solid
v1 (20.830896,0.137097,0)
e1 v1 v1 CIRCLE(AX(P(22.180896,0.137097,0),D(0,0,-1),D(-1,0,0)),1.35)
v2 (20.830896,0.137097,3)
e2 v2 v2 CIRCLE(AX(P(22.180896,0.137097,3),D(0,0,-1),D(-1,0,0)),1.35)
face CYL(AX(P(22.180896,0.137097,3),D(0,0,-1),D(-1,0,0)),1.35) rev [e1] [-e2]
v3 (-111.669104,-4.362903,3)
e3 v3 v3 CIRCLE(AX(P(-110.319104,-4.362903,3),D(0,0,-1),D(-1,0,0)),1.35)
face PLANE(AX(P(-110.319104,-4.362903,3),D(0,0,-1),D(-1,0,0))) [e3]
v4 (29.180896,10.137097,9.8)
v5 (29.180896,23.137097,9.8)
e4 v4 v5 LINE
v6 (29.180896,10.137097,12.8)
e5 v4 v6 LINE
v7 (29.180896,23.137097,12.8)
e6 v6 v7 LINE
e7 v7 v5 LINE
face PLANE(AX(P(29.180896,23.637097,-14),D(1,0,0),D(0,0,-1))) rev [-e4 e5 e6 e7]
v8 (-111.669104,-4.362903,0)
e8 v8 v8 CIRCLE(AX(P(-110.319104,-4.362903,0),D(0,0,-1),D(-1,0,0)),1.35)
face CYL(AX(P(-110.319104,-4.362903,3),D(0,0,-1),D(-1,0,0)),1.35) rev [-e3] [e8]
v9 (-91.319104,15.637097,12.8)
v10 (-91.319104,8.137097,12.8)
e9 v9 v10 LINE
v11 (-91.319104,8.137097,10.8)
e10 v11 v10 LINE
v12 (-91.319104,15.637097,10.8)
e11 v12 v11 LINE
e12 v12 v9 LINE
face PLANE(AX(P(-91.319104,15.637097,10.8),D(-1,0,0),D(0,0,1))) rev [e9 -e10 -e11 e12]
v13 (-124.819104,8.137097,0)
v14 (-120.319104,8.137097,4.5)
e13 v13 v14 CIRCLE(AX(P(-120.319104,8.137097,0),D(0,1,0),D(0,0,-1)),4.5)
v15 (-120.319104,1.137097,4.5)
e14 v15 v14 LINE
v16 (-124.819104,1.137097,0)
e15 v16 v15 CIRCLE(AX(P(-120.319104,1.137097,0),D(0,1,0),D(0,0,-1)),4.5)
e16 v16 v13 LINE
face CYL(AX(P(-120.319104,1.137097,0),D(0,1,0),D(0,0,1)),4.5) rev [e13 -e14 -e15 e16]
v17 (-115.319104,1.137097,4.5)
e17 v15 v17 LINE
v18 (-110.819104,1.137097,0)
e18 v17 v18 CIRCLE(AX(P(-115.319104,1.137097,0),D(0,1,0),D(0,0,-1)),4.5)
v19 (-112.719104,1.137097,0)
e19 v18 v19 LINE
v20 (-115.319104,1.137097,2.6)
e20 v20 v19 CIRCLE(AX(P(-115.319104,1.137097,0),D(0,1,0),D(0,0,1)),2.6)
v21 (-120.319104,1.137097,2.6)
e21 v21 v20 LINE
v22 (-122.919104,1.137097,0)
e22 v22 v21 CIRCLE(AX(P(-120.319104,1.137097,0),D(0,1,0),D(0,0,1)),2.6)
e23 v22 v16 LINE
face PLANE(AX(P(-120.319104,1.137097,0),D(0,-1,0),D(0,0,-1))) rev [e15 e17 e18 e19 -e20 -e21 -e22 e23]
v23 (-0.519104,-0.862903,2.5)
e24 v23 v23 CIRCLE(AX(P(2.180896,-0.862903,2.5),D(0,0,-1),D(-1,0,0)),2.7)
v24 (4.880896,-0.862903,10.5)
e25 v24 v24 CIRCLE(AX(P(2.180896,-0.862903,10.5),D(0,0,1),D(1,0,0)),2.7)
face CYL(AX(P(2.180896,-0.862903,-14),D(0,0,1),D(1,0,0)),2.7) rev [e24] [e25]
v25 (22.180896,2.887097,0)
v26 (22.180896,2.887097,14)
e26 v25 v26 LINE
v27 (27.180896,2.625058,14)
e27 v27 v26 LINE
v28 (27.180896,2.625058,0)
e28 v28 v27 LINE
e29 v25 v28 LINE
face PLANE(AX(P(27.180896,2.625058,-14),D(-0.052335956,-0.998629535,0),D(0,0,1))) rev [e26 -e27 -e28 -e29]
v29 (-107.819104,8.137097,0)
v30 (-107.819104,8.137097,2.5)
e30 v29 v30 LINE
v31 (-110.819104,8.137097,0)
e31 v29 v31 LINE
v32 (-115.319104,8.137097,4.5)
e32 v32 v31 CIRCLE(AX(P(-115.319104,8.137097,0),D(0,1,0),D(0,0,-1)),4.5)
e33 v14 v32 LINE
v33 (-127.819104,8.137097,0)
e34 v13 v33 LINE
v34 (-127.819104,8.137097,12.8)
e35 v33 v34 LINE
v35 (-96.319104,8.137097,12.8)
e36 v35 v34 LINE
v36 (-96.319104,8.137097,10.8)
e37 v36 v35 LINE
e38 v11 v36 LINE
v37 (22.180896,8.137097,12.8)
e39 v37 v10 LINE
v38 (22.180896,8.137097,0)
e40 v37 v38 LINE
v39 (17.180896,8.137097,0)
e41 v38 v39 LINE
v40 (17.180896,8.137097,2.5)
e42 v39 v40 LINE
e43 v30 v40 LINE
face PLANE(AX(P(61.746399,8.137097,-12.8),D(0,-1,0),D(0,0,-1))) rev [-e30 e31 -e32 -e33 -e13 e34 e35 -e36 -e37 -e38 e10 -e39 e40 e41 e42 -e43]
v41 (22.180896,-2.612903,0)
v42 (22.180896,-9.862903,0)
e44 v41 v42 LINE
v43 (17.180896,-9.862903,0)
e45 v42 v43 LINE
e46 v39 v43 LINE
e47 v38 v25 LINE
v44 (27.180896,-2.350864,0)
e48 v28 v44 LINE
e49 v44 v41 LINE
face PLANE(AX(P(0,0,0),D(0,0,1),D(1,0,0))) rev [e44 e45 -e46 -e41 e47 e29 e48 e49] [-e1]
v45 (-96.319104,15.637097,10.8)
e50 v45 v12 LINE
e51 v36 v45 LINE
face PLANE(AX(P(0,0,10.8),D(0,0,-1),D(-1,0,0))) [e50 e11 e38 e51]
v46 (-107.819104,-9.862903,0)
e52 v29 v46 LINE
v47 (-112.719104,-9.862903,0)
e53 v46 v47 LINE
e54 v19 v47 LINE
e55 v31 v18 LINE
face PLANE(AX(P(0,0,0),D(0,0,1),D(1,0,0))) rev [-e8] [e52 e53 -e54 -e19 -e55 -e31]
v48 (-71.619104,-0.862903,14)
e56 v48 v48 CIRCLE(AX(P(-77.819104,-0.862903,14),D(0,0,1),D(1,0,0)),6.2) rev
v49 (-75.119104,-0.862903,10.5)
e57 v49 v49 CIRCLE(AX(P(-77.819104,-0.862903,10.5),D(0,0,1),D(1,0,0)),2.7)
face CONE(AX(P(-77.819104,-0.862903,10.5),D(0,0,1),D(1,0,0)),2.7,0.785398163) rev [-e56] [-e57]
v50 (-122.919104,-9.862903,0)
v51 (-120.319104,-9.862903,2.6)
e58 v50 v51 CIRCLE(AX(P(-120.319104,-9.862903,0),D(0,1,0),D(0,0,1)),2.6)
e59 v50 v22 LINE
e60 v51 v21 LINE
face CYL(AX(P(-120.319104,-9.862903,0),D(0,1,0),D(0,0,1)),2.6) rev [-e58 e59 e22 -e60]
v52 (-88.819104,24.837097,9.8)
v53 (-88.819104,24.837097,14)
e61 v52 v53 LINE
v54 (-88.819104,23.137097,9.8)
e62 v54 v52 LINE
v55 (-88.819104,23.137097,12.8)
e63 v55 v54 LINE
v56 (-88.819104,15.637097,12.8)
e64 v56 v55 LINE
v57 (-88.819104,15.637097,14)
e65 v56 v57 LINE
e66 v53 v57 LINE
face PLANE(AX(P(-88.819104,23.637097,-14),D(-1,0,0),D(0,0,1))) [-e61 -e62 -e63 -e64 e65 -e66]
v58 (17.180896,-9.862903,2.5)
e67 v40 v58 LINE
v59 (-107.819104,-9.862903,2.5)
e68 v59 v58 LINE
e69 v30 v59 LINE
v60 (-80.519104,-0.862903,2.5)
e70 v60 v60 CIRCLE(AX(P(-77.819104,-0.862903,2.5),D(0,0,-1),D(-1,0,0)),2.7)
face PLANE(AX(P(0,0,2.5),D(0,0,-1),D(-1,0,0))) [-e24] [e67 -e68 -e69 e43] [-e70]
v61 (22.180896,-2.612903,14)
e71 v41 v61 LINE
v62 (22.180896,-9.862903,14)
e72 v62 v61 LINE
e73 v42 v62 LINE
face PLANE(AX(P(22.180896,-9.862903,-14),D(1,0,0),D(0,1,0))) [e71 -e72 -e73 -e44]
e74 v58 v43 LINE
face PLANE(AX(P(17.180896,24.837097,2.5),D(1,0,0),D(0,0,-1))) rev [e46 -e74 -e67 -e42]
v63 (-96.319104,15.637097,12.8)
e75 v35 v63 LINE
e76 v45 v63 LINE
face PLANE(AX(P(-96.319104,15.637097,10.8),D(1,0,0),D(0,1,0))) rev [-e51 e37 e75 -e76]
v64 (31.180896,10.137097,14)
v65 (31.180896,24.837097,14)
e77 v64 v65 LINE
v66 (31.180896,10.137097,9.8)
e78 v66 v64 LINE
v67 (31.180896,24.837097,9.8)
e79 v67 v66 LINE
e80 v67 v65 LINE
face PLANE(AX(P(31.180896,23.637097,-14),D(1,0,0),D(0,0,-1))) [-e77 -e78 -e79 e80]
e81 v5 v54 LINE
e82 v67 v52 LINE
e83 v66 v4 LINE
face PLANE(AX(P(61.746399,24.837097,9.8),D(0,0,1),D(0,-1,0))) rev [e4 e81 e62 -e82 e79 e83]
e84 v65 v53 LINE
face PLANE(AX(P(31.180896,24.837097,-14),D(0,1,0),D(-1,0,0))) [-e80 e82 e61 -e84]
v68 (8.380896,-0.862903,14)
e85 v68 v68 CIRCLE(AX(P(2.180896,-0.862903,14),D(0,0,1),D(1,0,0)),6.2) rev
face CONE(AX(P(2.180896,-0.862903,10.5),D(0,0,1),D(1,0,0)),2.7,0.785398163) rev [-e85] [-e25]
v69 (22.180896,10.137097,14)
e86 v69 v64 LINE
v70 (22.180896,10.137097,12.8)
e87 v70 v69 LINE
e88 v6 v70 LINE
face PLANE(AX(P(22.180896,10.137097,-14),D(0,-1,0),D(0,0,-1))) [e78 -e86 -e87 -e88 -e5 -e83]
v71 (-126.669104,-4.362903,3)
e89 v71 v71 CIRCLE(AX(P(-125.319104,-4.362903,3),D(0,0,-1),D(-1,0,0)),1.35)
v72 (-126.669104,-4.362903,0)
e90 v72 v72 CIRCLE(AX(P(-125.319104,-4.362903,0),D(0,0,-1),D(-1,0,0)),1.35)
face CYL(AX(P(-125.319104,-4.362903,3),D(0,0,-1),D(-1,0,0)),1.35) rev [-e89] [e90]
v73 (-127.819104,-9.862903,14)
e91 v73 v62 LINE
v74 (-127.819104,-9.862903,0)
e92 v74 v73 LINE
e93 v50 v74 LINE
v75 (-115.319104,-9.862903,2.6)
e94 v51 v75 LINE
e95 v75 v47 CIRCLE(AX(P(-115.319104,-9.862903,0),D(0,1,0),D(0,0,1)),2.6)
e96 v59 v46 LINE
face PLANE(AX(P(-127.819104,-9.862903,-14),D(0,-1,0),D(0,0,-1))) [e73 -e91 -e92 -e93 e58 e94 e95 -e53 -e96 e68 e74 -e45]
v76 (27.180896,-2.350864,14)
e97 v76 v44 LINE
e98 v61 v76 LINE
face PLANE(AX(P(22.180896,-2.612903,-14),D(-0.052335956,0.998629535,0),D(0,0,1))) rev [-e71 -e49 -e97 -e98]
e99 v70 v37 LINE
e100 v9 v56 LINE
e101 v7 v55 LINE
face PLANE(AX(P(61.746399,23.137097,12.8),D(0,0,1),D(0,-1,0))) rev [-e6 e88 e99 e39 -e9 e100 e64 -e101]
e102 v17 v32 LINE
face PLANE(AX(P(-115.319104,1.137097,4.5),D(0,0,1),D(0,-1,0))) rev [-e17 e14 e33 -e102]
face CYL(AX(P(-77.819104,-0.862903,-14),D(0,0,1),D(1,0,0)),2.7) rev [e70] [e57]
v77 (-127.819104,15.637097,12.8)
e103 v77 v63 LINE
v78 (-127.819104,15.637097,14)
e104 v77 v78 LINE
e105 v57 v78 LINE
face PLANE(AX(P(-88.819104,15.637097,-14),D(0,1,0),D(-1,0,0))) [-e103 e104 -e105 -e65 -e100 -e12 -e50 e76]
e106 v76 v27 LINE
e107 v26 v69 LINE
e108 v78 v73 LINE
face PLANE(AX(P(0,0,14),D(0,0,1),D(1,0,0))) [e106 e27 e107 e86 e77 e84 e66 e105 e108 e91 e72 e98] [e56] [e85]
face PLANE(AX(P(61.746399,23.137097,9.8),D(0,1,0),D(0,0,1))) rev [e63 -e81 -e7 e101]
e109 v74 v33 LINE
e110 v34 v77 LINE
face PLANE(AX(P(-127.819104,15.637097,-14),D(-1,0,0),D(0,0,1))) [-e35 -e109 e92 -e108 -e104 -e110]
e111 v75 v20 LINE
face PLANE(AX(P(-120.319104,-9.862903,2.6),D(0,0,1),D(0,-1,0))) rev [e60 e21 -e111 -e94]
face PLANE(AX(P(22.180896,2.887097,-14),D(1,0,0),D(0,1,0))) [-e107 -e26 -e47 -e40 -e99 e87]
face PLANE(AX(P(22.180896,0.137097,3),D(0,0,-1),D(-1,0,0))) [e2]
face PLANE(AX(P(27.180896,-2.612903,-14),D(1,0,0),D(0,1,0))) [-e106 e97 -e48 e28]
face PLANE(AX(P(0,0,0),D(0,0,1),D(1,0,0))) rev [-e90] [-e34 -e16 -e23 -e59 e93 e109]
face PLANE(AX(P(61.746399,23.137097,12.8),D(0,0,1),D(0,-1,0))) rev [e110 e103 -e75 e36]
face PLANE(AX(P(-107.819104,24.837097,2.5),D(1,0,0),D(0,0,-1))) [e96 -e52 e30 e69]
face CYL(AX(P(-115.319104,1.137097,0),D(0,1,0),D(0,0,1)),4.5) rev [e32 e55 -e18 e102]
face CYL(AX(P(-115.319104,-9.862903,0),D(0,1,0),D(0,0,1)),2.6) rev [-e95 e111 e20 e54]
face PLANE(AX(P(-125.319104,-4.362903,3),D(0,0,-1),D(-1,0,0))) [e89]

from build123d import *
from OCP.BRepFilletAPI import BRepFilletAPI_MakeChamfer

# Parameters (mm, degrees)
BOSS_EXTRUDE1_DEPTH      = 14
BOSS_EXTRUDE1_DEPTH_BACK = 14
CUT_EXTRUDE1_DEPTH       = 157
CUT_EXTRUDE4_DEPTH       = 2.5
CUT_EXTRUDE4_DEPTH_BACK  = 2.5
SKETCH8_W                = 125
SKETCH8_H                = 34.7
CUT_EXTRUDE5_DEPTH       = 131.960317585
CUT_EXTRUDE5_DEPTH_BACK  = 131.960317585
SKETCH9_R                = 2.7
CHAMFER2_SIZE            = 5
CHAMFER2_SIZE_2          = 0.262038896
CUT_EXTRUDE8_DEPTH       = 7
CUT_EXTRUDE9_DEPTH       = 131.749429849
SKETCH16_W               = 214.344642296
SKETCH16_H               = 84.645654919
CUT_EXTRUDE10_DEPTH      = 131.960317585
SKETCH17_W               = 2
SKETCH17_H               = 14.7
CUT_EXTRUDE11_DEPTH      = 9.8
SKETCH18_R               = 1.35
CUT_EXTRUDE12_DEPTH      = 3
CHAMFER7_SIZE            = 3.5
SKETCH19_W               = 5
SKETCH19_H               = 7.5
BOSS_EXTRUDE2_DEPTH      = 2


with BuildPart() as part:
    # Sketch1 → Boss-Extrude1 (new, two sides: drawn at the far end of the back side and taken through both)
    with BuildSketch(Plane.XY.offset(-BOSS_EXTRUDE1_DEPTH_BACK)):
        Polygon((-127.819104229, -9.862903226), (22.180895771, -9.862903226), (22.180895771, -2.612903226), (27.180895771, -2.612903226), (27.180895771, 2.887096774), (22.180895771, 2.887096774), (22.180895771, 10.137096774), (31.180895771, 10.137096774), (31.180895771, 23.637096774), (31.180895771, 24.837096774), (-88.819104229, 24.837096774), (-88.819104229, 23.637096774), (-88.819104229, 15.637096774), (-127.819104229, 15.637096774), align=None)
    extrude(amount=BOSS_EXTRUDE1_DEPTH + BOSS_EXTRUDE1_DEPTH_BACK)

    # Sketch2 → Cut-Extrude1 (cut)
    with BuildSketch(Plane.ZY.offset(127.819104229)):
        Polygon((-12.8, 23.137096774), (-12.8, 8.137096774), (12.8, 8.137096774), (12.8, 23.137096774), (9.8, 23.137096774), (9.8, 24.837096774), (-9.8, 24.837096774), (-9.8, 23.137096774), align=None)
    extrude(amount=-CUT_EXTRUDE1_DEPTH, mode=Mode.SUBTRACT)

    # Sketch8 → Cut-Extrude4 (cut, two sides: drawn at the far end of the back side and taken through both)
    with BuildSketch(Plane.XY.offset(-CUT_EXTRUDE4_DEPTH_BACK)):
        with Locations((-45.319104229, 7.487096774)):
            Rectangle(SKETCH8_W, SKETCH8_H)
    extrude(amount=CUT_EXTRUDE4_DEPTH + CUT_EXTRUDE4_DEPTH_BACK, mode=Mode.SUBTRACT)

    # Sketch9 → Cut-Extrude5 (cut, two sides: drawn at the far end of the back side and taken through both)
    with BuildSketch(Plane.XY.offset(-CUT_EXTRUDE5_DEPTH_BACK)):
        with Locations((-77.819104229, -0.862903226)):
            Circle(SKETCH9_R)
        with Locations((2.180895771, -0.862903226)):
            Circle(SKETCH9_R)
    extrude(amount=CUT_EXTRUDE5_DEPTH + CUT_EXTRUDE5_DEPTH_BACK, mode=Mode.SUBTRACT)

    # Chamfer2
    chamfer2_edges_1 = [part.edges().sort_by_distance(p)[0] for p in [
        (27.180895771, -2.612903226, 0),
    ]]
    chamfer2_side_1 = [part.faces().sort_by_distance(p)[0] for p in [
        (27.175654993, -2.612903226, 0),
    ]]
    chamfer2_edges_2 = [part.edges().sort_by_distance(p)[0] for p in [
        (27.180895771, 2.887096774, 0),
    ]]
    chamfer2_side_2 = [part.faces().sort_by_distance(p)[0] for p in [
        (27.180895771, 2.881855996, 0),
    ]]
    chamfer2 = BRepFilletAPI_MakeChamfer(part.part.solid().wrapped)
    for e in chamfer2_edges_1:
        chamfer2.Add(CHAMFER2_SIZE - 0.0001, CHAMFER2_SIZE_2 - 0.0001, e.wrapped, chamfer2_side_1[0].wrapped)
    for e in chamfer2_edges_2:
        chamfer2.Add(CHAMFER2_SIZE_2 - 0.0001, CHAMFER2_SIZE - 0.0001, e.wrapped, chamfer2_side_2[0].wrapped)
    add(Compound.cast(chamfer2.Shape()), mode=Mode.REPLACE)  # a hair under: the kernel refuses the full size

    # Sketch14 → Cut-Extrude8 (cut)
    with BuildSketch(Plane(origin=(0, 8.137096774, 0), x_dir=(1, 0, 0), z_dir=(0, 1, 0))):
        with BuildLine():
            Line((-120.319104229, 4.5), (-115.319104229, 4.5))
            ThreePointArc((-115.319104229, 4.5), (-110.819104229, 0), (-115.319104229, -4.5))
            Line((-115.319104229, -4.5), (-120.319104229, -4.5))
            ThreePointArc((-120.319104229, -4.5), (-124.819104229, 0), (-120.319104229, 4.5))
        make_face()
    extrude(amount=-CUT_EXTRUDE8_DEPTH, mode=Mode.SUBTRACT)

    # Sketch15 → Cut-Extrude9 (cut, through all)
    with BuildSketch(Plane(origin=(0, 1.137096774, 0), x_dir=(1, 0, 0), z_dir=(0, 1, 0))):
        with BuildLine():
            Line((-120.319104229, -2.6), (-115.319104229, -2.6))
            ThreePointArc((-115.319104229, -2.6), (-112.719104229, 0), (-115.319104229, 2.6))
            Line((-115.319104229, 2.6), (-120.319104229, 2.6))
            ThreePointArc((-120.319104229, 2.6), (-122.919104229, 0), (-120.319104229, -2.6))
        make_face()
    extrude(amount=-CUT_EXTRUDE9_DEPTH, mode=Mode.SUBTRACT)

    # Sketch16 → Cut-Extrude10 (cut, through all)
    with BuildSketch(Plane.XY):
        with Locations((-30.272765953, 16.776086779)):
            Rectangle(SKETCH16_W, SKETCH16_H)
    extrude(amount=-CUT_EXTRUDE10_DEPTH, mode=Mode.SUBTRACT)

    # Sketch17 → Cut-Extrude11 (cut)
    with BuildSketch(Plane(origin=(0, 0, 0), x_dir=(-1, 0, 0), z_dir=(0, 0, -1))):
        with Locations((-30.180895771, 17.487096774)):
            Rectangle(SKETCH17_W, SKETCH17_H)
    extrude(amount=-CUT_EXTRUDE11_DEPTH, mode=Mode.SUBTRACT)

    # Sketch18 → Cut-Extrude12 (cut)
    with BuildSketch(Plane(origin=(0, 0, 0), x_dir=(-1, 0, 0), z_dir=(0, 0, -1))):
        with Locations((110.319104229, -4.362903226)):
            Circle(SKETCH18_R)
        with Locations((125.319104229, -4.362903226)):
            Circle(SKETCH18_R)
        with Locations((-22.180895771, 0.137096774)):
            Circle(SKETCH18_R)
    extrude(amount=-CUT_EXTRUDE12_DEPTH, mode=Mode.SUBTRACT)

    # Chamfer7
    chamfer7_edges = [part.edges().sort_by_distance(p)[0] for p in [
        (-80.519104229, -0.862903226, 14),
        (-0.519104229, -0.862903226, 14),
    ]]
    chamfer(chamfer7_edges, length=CHAMFER7_SIZE)

    # Sketch19 → Boss-Extrude2 (add)
    with BuildSketch(Plane(origin=(0, 0, 12.8), x_dir=(-1, 0, 0), z_dir=(0, 0, -1))):
        with Locations((93.819104229, 11.887096774)):
            Rectangle(SKETCH19_W, SKETCH19_H)
    extrude(amount=BOSS_EXTRUDE2_DEPTH)


solid = part.part
